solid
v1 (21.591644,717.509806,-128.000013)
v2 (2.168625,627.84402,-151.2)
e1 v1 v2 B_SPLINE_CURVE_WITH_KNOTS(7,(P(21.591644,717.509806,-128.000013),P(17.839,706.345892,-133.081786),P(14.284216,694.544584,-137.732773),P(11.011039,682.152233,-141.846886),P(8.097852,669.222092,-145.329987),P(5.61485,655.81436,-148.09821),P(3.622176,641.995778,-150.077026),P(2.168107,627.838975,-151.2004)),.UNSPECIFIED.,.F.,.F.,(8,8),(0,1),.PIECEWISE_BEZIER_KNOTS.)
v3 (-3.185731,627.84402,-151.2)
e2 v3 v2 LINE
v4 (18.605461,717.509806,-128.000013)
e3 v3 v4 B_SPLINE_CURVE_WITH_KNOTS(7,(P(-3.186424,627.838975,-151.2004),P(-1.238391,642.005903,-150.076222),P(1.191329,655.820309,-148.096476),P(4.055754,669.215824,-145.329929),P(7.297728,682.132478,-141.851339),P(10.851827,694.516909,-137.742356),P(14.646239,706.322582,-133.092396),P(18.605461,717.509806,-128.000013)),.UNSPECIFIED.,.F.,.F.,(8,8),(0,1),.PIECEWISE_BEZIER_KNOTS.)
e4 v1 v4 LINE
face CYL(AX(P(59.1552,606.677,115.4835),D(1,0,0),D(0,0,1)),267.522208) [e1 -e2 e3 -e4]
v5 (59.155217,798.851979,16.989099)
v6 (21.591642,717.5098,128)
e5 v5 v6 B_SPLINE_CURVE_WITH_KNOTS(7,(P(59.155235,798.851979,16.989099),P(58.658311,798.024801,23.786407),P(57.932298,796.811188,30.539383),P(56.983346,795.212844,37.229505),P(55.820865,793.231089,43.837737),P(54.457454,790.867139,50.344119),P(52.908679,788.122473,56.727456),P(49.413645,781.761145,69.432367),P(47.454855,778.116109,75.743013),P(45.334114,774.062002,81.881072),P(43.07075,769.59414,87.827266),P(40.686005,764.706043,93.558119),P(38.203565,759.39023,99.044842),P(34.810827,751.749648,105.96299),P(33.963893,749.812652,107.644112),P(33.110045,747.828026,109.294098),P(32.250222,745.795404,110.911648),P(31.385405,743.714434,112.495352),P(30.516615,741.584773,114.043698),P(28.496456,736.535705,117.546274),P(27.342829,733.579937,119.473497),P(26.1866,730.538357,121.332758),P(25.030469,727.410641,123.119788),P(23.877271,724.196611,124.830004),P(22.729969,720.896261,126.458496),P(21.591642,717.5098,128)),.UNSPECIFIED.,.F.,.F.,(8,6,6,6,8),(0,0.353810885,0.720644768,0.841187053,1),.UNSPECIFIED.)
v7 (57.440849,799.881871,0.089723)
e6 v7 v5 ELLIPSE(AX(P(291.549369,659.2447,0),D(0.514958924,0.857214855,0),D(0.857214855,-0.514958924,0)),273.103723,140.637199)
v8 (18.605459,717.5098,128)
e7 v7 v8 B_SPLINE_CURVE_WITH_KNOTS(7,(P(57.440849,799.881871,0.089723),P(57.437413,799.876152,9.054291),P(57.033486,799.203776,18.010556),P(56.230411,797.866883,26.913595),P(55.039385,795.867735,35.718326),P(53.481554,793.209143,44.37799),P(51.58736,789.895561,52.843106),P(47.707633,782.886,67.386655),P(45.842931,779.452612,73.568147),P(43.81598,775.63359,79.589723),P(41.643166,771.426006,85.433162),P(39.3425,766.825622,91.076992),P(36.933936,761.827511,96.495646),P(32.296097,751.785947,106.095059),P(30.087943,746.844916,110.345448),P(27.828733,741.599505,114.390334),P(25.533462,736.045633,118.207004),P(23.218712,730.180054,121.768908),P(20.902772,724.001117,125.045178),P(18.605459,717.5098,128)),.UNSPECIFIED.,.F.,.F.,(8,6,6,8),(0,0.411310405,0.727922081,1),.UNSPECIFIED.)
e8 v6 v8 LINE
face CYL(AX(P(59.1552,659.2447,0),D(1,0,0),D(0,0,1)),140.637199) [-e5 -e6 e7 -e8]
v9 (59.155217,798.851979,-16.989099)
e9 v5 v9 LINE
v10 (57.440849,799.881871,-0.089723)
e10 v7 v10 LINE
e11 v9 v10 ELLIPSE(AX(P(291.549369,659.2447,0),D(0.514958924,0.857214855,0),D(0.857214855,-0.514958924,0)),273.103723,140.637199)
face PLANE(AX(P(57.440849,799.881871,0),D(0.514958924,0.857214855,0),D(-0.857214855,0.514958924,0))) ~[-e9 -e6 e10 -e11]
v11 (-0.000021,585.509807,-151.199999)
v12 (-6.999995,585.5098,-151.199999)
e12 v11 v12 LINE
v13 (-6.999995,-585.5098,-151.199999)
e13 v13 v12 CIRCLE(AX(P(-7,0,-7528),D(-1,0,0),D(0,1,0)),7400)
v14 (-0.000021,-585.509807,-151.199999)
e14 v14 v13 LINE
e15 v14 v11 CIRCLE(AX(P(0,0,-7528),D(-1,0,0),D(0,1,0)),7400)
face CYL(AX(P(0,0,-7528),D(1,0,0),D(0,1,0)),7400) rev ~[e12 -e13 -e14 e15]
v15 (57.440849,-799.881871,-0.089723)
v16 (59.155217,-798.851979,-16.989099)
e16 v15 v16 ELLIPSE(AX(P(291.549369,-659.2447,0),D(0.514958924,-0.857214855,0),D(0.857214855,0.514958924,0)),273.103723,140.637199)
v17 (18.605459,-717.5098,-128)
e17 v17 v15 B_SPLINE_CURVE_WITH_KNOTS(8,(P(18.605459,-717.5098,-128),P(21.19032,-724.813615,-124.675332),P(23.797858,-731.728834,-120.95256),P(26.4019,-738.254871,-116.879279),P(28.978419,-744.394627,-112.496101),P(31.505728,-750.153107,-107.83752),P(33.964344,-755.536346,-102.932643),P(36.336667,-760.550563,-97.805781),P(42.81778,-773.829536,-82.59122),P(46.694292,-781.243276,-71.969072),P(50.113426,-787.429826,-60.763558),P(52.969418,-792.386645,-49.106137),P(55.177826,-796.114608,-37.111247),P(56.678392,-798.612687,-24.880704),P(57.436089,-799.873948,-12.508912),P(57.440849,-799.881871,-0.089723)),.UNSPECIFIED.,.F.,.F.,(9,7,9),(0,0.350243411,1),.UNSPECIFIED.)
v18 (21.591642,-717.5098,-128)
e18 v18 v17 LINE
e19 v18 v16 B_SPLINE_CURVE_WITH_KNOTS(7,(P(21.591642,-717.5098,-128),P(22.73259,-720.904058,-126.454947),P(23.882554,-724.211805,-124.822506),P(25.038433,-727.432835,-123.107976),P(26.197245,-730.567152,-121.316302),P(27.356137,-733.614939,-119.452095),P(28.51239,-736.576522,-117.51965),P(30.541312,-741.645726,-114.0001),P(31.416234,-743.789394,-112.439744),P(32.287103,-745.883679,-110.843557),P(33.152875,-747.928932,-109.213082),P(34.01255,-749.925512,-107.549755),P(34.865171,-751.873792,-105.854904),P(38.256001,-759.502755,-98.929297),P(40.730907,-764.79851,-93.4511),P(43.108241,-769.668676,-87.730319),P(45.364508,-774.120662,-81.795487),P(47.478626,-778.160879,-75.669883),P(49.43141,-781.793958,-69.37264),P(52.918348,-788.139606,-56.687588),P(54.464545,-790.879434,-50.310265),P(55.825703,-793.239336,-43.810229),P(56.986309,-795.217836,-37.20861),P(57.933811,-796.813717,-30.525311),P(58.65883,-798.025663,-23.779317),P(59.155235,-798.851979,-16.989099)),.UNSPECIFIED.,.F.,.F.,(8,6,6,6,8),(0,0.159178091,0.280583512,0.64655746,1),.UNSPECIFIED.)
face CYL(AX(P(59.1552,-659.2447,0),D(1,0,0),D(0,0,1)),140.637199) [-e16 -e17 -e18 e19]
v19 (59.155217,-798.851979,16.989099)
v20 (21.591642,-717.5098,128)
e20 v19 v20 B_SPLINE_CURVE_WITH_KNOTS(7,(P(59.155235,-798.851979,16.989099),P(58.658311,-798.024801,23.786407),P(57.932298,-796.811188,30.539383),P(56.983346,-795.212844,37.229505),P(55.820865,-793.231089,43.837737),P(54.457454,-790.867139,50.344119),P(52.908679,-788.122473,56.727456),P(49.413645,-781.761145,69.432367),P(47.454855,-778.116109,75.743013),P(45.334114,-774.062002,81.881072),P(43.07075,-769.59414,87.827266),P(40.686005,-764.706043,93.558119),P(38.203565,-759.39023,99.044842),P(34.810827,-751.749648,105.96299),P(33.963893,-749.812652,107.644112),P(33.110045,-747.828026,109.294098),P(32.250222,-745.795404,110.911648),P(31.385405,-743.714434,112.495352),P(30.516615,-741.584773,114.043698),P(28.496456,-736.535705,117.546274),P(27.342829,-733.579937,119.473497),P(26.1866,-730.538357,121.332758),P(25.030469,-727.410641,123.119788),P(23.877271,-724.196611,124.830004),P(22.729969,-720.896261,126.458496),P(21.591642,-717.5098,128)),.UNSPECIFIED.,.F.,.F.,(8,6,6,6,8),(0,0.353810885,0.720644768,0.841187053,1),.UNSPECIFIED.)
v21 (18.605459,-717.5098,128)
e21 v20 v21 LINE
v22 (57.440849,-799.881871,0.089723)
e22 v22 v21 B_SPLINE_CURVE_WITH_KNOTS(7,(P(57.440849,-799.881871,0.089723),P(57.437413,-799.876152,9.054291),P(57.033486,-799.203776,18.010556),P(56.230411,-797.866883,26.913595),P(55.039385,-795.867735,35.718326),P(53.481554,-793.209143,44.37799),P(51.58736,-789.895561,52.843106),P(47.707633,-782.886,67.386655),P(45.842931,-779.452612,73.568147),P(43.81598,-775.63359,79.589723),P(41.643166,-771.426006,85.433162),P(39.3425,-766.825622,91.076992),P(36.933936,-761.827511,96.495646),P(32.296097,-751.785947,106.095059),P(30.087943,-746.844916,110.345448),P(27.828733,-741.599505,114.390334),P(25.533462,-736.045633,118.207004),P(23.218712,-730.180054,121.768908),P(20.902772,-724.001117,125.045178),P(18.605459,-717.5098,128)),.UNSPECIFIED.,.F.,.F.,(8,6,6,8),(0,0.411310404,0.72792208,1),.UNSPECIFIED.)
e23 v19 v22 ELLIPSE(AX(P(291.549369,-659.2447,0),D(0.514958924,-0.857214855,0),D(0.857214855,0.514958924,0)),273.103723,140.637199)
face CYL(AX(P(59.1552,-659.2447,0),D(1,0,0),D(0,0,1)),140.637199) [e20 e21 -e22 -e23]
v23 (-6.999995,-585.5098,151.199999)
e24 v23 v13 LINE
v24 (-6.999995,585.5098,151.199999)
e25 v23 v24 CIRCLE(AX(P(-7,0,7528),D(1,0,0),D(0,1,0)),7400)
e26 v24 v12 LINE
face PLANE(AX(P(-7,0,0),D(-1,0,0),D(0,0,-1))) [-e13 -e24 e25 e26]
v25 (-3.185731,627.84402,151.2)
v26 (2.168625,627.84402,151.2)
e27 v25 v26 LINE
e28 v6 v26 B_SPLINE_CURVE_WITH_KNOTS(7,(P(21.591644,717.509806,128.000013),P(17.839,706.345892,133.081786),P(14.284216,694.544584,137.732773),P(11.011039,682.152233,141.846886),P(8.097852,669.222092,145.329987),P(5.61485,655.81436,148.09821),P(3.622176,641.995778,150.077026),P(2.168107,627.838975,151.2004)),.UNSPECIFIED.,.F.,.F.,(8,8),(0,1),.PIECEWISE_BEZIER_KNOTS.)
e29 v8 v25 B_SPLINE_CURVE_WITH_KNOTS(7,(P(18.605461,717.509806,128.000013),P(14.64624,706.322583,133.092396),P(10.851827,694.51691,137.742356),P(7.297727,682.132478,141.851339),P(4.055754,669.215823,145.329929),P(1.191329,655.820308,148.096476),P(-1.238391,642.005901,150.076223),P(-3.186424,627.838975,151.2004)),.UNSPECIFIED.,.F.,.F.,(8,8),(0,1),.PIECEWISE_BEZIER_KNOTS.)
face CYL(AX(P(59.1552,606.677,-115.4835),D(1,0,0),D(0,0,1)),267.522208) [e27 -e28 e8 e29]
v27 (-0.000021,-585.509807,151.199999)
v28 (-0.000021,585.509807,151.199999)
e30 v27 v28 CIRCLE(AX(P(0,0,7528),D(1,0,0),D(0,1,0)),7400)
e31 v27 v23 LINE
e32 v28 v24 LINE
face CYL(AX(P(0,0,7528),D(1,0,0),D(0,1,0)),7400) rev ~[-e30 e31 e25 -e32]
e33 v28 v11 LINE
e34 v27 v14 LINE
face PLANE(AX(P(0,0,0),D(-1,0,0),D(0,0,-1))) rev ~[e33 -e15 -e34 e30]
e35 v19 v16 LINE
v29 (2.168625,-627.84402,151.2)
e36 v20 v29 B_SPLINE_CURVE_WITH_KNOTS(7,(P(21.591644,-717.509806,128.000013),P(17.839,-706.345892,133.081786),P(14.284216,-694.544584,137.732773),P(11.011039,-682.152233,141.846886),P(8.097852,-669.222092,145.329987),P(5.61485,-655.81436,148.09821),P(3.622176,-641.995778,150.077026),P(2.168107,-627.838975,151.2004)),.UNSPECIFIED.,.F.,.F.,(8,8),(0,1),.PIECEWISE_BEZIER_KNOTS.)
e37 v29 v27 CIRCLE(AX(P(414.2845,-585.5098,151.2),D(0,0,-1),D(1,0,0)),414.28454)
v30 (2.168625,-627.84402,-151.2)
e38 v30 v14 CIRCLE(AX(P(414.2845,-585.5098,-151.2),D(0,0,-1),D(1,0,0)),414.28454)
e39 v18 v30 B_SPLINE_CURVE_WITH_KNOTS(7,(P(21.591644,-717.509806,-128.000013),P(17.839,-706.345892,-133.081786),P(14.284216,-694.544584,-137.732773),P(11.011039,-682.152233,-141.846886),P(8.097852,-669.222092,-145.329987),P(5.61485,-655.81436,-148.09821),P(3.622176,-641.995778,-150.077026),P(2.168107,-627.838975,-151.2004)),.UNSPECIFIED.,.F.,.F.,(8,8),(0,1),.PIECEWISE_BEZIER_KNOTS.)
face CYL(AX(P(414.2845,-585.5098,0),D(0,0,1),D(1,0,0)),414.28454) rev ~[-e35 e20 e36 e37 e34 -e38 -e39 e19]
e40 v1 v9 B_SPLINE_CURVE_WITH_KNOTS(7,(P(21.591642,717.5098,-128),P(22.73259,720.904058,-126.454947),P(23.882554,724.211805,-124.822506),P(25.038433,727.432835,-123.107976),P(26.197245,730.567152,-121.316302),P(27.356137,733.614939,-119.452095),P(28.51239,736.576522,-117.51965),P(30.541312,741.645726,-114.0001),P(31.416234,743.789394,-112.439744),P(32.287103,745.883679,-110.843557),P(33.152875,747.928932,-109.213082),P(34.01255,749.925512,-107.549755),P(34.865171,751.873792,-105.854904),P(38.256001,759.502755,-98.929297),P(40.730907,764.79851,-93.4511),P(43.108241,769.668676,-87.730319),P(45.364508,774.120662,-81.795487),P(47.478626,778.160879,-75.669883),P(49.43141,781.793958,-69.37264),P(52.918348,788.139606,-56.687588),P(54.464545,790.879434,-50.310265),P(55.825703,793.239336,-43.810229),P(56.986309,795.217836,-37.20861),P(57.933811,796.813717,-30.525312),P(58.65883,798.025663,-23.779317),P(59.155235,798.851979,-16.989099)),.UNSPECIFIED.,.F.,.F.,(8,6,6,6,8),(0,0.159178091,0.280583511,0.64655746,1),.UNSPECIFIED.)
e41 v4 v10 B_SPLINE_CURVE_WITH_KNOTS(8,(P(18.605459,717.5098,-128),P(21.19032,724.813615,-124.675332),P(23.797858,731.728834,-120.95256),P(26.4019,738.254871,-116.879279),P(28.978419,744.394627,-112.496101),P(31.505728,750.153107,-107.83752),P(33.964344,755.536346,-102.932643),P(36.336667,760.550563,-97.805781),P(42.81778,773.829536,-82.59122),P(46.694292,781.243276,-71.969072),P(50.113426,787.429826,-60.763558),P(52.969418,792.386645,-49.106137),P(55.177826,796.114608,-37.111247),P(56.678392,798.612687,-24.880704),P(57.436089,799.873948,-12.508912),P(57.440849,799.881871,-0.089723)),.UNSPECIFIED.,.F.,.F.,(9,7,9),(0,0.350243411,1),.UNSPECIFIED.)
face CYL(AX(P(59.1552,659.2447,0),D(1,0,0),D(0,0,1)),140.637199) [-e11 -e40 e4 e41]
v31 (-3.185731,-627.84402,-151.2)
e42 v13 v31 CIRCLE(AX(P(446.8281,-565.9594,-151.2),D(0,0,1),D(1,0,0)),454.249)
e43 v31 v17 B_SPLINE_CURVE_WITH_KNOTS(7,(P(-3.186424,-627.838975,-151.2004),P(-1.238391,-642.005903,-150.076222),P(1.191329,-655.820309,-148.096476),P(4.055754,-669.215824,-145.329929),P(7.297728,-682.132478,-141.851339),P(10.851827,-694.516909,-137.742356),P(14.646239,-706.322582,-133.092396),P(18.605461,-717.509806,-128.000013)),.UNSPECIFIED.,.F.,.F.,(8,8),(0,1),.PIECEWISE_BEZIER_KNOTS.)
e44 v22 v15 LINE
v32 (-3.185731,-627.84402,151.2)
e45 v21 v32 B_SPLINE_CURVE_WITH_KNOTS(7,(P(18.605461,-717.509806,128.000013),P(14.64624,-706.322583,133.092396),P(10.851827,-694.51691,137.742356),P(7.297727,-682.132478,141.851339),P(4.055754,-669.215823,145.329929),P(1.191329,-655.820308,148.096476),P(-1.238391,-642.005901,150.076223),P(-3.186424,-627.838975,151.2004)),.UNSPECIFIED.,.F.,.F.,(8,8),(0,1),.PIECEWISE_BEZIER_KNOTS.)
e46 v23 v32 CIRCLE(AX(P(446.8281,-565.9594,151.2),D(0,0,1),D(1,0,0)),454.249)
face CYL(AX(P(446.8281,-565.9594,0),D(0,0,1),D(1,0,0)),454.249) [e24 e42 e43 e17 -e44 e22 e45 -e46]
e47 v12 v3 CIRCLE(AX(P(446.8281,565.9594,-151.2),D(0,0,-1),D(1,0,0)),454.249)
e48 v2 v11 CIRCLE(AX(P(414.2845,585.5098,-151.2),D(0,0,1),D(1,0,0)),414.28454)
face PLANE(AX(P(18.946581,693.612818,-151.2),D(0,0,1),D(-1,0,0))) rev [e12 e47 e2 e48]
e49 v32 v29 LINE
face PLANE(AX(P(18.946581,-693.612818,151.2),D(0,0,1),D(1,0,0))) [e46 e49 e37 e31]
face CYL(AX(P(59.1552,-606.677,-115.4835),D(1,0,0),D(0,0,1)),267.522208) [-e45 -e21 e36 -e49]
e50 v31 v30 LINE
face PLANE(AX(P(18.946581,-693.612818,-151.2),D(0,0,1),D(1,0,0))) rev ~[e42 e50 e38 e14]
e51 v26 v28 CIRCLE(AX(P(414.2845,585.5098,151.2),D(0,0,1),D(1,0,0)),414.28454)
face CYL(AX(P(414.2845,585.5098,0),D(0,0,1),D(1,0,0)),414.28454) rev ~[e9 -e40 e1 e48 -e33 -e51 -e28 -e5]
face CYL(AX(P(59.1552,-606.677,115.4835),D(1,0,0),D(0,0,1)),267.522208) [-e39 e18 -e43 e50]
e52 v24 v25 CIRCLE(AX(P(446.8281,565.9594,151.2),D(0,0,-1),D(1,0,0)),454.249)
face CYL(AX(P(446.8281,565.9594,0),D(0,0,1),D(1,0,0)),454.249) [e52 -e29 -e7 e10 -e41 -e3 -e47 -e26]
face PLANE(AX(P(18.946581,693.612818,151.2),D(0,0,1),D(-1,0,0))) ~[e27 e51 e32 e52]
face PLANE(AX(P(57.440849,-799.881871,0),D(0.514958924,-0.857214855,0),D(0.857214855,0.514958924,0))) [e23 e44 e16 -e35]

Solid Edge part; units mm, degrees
sketch "Sketch1" plane through (0, 0, 0) normal (1, 0, 0) x (0, 1, 0)
  arc A0 (-585.5098, 151.2) -> (585.5098, 151.2) centre (0, 7528) ccw
  line L0 (585.5098, 151.2) -> (585.5098, -151.2)
  arc A1 (-585.5098, -151.2) -> (585.5098, -151.2) centre (0, -7528) cw
  line L1 (-585.5098, 151.2) -> (-585.5098, -151.2)
extrude "Protrusion1" add sketch "Sketch1" against normal blind 7
sketch "Sketch2" plane through (0, -800, 0) normal (0, 0, -1) x (1, 0, 0)
  arc A0 (59.1552, -1.148) -> (0, -214.4902) centre (414.2845, -214.4902) ccw
  line L0 (0, -214.4902) -> (-7, -214.4902)
  arc A1 (-7, -214.4902) -> (57.4408, -0.1181) centre (446.8281, -234.0406) cw
  line L1 (57.4408, -0.1181) -> (59.1552, -1.148)
extrude "ExtrudedProtrusion_4" add sketch "Sketch2" along normal mid plane 302.4
sketch "Sketch3" plane through (59.1552, 0, 0) normal (1, 0, 0) x (0, 0, 1)
  arc A0 (-128, 717.5098) -> (128, 717.5098) centre (0, 659.2447) cw
  arc A1 (128, 717.5098) -> (151.2, 585.5098) centre (-115.4835, 606.677) cw
  line L0 (265.9453, 585.5098) -> (151.2, 585.5098)
  line L1 (265.9453, 882.5583) -> (265.9453, 585.5098)
  line L2 (-248.3835, 882.5583) -> (265.9453, 882.5583)
  line L3 (-248.3835, 585.5098) -> (-248.3835, 882.5583)
  line L4 (-151.2, 585.5098) -> (-248.3835, 585.5098)
  arc A2 (-151.2, 585.5098) -> (-128, 717.5098) centre (115.4835, 606.677) cw
extrude "Cutout1" cut sketch "Sketch3" against normal through all
mirror "Mirror1" about plane through (0, 0, 0) normal (0, -1, 0) of "ExtrudedProtrusion_4"
sketch "Sketch4" plane through (59.1552, 0, 0) normal (1, 0, 0) x (0, 0, 1)
  line L0 (-268.9862, -585.5098) -> (-151.2, -585.5098)
  arc A0 (-151.2, -585.5098) -> (-128, -717.5098) centre (115.4835, -606.677) ccw
  arc A1 (-128, -717.5098) -> (128, -717.5098) centre (0, -659.2447) ccw
  arc A2 (128, -717.5098) -> (151.2, -585.5098) centre (-115.4835, -606.677) ccw
  line L1 (359.5482, -585.5098) -> (151.2, -585.5098)
  line L2 (359.5482, -919.291) -> (359.5482, -585.5098)
  line L3 (-268.9862, -919.291) -> (359.5482, -919.291)
  line L4 (-268.9862, -585.5098) -> (-268.9862, -919.291)
extrude "Cutout2" cut sketch "Sketch4" against normal through all
